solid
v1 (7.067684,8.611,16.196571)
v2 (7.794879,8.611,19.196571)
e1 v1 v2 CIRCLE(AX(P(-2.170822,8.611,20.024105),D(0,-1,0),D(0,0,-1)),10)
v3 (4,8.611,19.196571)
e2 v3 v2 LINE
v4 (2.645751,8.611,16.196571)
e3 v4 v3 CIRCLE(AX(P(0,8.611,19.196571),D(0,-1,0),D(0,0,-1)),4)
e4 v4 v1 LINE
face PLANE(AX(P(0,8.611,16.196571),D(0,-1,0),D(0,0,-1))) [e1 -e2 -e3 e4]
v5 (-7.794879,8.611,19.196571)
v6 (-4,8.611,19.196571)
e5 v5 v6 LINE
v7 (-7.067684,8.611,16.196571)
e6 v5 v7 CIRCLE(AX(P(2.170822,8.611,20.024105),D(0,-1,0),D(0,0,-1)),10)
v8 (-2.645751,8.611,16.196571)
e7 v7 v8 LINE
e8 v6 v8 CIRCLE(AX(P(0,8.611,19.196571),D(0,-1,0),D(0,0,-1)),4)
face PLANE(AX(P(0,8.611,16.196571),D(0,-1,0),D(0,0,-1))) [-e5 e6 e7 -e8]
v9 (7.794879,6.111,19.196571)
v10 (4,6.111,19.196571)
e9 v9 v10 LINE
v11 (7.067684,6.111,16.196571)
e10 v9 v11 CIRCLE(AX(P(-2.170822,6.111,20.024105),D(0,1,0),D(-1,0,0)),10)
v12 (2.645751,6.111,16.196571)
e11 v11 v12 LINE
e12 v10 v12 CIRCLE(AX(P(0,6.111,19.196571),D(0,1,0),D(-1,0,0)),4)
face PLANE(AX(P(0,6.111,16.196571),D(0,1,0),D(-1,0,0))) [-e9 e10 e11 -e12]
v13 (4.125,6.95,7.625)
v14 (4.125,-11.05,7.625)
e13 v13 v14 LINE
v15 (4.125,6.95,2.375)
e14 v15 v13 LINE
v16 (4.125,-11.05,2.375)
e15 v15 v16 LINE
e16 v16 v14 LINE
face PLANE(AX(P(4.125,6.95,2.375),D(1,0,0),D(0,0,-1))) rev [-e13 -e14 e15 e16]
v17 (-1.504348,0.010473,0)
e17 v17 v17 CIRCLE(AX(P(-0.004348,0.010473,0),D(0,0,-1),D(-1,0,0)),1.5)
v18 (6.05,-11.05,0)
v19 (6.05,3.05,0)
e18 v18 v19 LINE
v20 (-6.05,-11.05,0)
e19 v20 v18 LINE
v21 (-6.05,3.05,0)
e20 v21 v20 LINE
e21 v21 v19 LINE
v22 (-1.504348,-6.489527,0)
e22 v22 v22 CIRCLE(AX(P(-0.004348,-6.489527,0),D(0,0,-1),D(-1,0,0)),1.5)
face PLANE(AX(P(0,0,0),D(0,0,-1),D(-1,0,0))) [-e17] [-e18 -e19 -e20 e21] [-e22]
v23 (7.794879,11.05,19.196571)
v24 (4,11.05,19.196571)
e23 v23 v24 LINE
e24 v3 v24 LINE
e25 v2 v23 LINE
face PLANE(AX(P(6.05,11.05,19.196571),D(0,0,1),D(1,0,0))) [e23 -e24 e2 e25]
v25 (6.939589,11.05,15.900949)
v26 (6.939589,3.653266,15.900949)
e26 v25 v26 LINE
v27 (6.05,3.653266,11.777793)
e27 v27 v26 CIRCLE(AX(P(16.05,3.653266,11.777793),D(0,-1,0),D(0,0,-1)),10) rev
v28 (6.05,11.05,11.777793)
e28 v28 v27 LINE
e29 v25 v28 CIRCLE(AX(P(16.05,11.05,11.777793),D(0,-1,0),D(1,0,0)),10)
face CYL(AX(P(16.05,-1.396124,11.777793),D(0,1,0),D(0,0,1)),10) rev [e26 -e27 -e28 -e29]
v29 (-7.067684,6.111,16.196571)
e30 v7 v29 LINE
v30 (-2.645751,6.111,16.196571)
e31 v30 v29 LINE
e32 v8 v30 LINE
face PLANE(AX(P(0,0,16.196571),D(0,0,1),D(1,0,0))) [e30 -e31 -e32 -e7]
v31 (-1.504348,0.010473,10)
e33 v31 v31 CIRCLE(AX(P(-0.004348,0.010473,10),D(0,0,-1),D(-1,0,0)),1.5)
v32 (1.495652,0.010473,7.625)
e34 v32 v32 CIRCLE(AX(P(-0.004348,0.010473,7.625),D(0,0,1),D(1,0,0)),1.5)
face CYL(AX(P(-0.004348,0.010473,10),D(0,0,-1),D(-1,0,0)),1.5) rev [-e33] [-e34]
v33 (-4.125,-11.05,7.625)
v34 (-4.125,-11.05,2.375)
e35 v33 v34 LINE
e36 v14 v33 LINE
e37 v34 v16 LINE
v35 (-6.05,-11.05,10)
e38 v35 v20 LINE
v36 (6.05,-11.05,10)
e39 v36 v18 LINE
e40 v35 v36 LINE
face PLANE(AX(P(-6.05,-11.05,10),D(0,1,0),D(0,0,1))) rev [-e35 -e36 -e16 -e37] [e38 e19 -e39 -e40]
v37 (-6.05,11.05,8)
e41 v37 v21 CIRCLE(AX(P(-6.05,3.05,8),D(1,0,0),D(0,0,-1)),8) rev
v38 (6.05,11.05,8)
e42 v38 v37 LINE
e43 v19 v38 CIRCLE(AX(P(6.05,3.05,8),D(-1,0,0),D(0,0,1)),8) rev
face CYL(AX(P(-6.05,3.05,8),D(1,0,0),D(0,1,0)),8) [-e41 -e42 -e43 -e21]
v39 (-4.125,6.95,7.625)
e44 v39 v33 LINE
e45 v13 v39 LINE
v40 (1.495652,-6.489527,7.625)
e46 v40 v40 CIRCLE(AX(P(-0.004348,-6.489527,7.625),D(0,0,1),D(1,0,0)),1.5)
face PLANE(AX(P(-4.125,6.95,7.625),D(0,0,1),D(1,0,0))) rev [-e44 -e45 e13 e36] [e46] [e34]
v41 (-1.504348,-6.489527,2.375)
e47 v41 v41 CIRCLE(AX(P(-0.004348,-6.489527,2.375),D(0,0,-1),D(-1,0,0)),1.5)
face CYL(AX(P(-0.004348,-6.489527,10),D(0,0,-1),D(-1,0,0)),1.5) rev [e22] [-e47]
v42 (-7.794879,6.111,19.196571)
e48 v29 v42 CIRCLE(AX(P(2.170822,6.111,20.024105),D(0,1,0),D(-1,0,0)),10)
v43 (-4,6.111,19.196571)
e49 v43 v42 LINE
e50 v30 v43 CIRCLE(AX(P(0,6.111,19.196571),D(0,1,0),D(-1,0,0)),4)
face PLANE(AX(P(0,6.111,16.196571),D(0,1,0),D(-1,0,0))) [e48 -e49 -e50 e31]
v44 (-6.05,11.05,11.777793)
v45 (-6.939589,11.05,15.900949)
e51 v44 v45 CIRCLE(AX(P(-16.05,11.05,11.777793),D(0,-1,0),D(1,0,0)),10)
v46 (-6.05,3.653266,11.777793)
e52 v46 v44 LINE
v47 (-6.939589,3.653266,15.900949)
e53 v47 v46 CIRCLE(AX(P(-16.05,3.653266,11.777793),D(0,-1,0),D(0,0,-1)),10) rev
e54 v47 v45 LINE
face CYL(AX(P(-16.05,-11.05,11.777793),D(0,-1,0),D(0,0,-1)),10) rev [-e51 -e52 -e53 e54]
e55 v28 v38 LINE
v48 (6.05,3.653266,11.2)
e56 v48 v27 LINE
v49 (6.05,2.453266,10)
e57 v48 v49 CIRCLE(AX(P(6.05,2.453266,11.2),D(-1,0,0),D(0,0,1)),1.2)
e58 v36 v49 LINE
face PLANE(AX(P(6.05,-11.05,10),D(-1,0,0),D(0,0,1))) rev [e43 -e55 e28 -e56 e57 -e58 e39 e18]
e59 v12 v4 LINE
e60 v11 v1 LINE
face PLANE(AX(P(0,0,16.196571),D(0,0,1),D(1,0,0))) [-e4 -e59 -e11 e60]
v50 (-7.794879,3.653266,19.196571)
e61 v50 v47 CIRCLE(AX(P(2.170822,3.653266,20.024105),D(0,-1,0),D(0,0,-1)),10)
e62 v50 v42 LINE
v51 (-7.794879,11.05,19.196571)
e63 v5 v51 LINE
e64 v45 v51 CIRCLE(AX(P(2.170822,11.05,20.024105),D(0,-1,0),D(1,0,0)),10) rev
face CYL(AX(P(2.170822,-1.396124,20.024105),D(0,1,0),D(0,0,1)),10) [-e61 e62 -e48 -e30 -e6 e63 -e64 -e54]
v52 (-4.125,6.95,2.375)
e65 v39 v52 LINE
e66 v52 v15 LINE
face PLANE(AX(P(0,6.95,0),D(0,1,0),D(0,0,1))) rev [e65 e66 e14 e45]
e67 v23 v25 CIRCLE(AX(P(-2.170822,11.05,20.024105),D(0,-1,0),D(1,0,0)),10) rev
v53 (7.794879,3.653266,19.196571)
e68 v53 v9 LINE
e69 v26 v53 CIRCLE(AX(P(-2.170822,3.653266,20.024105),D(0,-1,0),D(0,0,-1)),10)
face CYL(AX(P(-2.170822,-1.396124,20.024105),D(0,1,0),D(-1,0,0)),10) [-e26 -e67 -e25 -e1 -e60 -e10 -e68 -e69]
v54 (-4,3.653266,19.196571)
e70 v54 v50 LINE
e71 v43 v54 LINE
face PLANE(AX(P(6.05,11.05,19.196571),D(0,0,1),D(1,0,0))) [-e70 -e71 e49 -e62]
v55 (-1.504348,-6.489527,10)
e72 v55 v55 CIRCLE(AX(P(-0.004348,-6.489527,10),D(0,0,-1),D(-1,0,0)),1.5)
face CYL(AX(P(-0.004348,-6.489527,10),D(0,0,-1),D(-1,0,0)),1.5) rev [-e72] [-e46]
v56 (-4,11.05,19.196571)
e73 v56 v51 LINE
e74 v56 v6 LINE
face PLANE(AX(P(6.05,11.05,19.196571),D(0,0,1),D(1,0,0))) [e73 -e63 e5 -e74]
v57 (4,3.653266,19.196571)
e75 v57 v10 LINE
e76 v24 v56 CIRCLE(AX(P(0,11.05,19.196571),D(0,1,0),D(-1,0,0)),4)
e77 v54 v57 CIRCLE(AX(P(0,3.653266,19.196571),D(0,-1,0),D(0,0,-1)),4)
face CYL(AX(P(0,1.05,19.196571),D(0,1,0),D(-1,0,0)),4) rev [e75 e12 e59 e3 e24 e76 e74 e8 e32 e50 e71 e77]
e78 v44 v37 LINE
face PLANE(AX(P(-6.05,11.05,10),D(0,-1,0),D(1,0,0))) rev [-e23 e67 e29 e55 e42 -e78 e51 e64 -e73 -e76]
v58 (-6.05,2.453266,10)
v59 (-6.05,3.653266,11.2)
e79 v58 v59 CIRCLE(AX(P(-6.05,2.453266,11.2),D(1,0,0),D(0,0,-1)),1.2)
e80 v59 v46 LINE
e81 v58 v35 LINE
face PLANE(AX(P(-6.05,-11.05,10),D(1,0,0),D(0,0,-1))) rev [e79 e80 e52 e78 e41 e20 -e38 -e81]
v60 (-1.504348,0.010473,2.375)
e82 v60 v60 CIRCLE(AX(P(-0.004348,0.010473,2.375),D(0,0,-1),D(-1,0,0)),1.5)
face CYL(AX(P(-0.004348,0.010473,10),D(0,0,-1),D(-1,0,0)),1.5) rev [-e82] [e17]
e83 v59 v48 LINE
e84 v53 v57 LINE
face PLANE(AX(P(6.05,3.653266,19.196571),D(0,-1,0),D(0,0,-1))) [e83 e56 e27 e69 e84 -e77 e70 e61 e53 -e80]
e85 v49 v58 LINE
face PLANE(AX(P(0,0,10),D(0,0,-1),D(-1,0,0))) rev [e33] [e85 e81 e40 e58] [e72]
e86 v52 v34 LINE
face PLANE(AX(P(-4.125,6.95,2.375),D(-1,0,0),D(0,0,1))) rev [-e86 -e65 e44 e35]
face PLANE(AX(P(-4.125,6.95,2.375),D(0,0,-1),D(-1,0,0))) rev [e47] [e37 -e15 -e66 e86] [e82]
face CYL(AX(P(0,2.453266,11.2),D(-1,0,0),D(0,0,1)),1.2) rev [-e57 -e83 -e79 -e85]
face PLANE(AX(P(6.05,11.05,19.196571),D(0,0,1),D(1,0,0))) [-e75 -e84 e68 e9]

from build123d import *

# Parameters (mm, degrees)
IZIM1_W                     = 12.1
IZIM1_H                     = 22.1
Y_KSEKLIK_EKSTR_ZYON1_DEPTH = 10
IZIM2_W                     = 8.25
IZIM2_H                     = 5.25
KES_EKSTR_ZYON1_DEPTH       = 18
IZIM3_R                     = 1.5
KES_EKSTR_ZYON2_DEPTH       = 17.084309124
IZIM4_W                     = 9.196571059
IZIM4_H                     = 7.396734232
Y_KSEKLIK_EKSTR_ZYON2_DEPTH = 12.1
IZIM6_W                     = 3.5
IZIM6_H                     = 2.438999841
IZIM6_H_2                   = 2.5
IZIM6_H_3                   = 2.457734391
IZIM6_W_2                   = 4.3
KES_EKSTR_ZYON3_DEPTH       = 3
RADYUS1_R                   = 1.2
RADYUS2_R                   = 8
IZIM7_R                     = 4
KES_EKSTR_ZYON4_DEPTH       = 10
IZIM8_W                     = 1.744878744
IZIM8_H                     = 1.717356621
Y_KSEKLIK_EKSTR_ZYON3_DEPTH = 7.396734232
KES_EKSTR_ZYON5_DEPTH       = 50
KES_EKSTR_ZYON5_DEPTH_BACK  = 50
IZIM9_W                     = 3
IZIM9_H                     = 2.5
RADYUS3_R                   = 10
RADYUS4_START               = 3
RADYUS4_DEPTH               = 9


with BuildPart() as part:
    # Çizim1 → Yükseklik-Ekstrüzyon1 (new body)
    with BuildSketch(Plane.XY):
        Rectangle(IZIM1_W, IZIM1_H)
    extrude(amount=Y_KSEKLIK_EKSTR_ZYON1_DEPTH)

    # Çizim2 → Kes-Ekstrüzyon1 (cut)
    with BuildSketch(Plane.XZ.offset(11.05)):
        with Locations((0, 5)):
            Rectangle(IZIM2_W, IZIM2_H)
    extrude(amount=-KES_EKSTR_ZYON1_DEPTH, mode=Mode.SUBTRACT)

    # Çizim3 → Kes-Ekstrüzyon2 (cut, through all)
    with BuildSketch(Plane(origin=(0, 0, 0), x_dir=(-1, 0, 0), z_dir=(0, 0, -1))):
        with Locations((0.004348468, -6.489526702)):
            Circle(IZIM3_R)
        with Locations((0.004348468, 0.010473298)):
            Circle(IZIM3_R)
    extrude(amount=-KES_EKSTR_ZYON2_DEPTH, mode=Mode.SUBTRACT)

    # Çizim4 → Yükseklik-Ekstrüzyon2 (add, through all)
    with BuildSketch(Plane.ZY.offset(6.05)):
        with Locations((14.59828553, 7.351632884)):
            Rectangle(IZIM4_W, IZIM4_H)
    extrude(amount=-Y_KSEKLIK_EKSTR_ZYON2_DEPTH)

    # Çizim6 → Kes-Ekstrüzyon3 (cut)
    with BuildSketch(Plane.XY.offset(19.196571059)):
        with Locations((0, 9.83050008)):
            Rectangle(IZIM6_W, IZIM6_H)
        with Locations((0, 7.361000159)):
            Rectangle(IZIM6_W, IZIM6_H_2)
        with Locations((0, 4.882132964)):
            Rectangle(IZIM6_W, IZIM6_H_3)
        with Locations((3.9, 7.361000159)):
            Rectangle(IZIM6_W_2, IZIM6_H_2)
        with Locations((-3.9, 7.361000159)):
            Rectangle(IZIM6_W_2, IZIM6_H_2)
    extrude(amount=-KES_EKSTR_ZYON3_DEPTH, mode=Mode.SUBTRACT)

    # Radyus1
    radyus1_edges = [part.edges().sort_by_distance(p)[0] for p in [
        (0, 3.653265768, 10),
    ]]
    fillet(radyus1_edges, radius=RADYUS1_R)

    # Radyus2
    radyus2_edges = [part.edges().sort_by_distance(p)[0] for p in [
        (0, 11.05, 0),
    ]]
    fillet(radyus2_edges, radius=RADYUS2_R)

    # Çizim7 → Kes-Ekstrüzyon4 (cut)
    with BuildSketch(Plane(origin=(0, 11.05, 0), x_dir=(1, 0, 0), z_dir=(0, 1, 0))):
        with Locations((0, -19.196571059)):
            Circle(IZIM7_R)
    extrude(amount=-KES_EKSTR_ZYON4_DEPTH, mode=Mode.SUBTRACT)

    # Çizim8 → Yükseklik-Ekstrüzyon3 (add)
    with BuildSketch(Plane(origin=(0, 11.05, 0), x_dir=(1, 0, 0), z_dir=(0, 1, 0))):
        with Locations((-6.922439372, -18.337892748)):
            Rectangle(IZIM8_W, IZIM8_H)
        Polygon((-6.05, -14.458244553), (-7.794878744, -17.479214438), (-6.05, -17.479214438), align=None)
        Polygon((6.05, -17.479214438), (7.794878744, -17.479214438), (6.05, -14.458244553), align=None)
        with Locations((6.922439372, -18.337892748)):
            Rectangle(IZIM8_W, IZIM8_H)
    extrude(amount=-Y_KSEKLIK_EKSTR_ZYON3_DEPTH)

    # Çizim9 → Kes-Ekstrüzyon5 (cut, two sides: drawn at the far end of the back side and taken through both)
    with BuildSketch(Plane.ZY.offset(-6.05).offset(-KES_EKSTR_ZYON5_DEPTH_BACK)):
        with Locations((17.696571059, 7.361000159)):
            Rectangle(IZIM9_W, IZIM9_H)
    extrude(amount=KES_EKSTR_ZYON5_DEPTH + KES_EKSTR_ZYON5_DEPTH_BACK, mode=Mode.SUBTRACT)

    # Radyus3
    # the kernel refuses this fillet: 10 mm, written as the material it adds along each edge
    with BuildSketch(Plane(origin=(6.05, 11.05, 14.458244553), x_dir=(0, 0, -1), z_dir=(0, -1, 0))) as radyus3_piece_1_section:
        with BuildLine():
            CenterArc((RADYUS3_R * 0.268045105611, RADYUS3_R), RADYUS3_R, 239.989745652, 30.010254348)
            Line((-RADYUS3_R * 0.232109880799, RADYUS3_R * 0.134064096154), (0, 0))
            Line((0, 0), (RADYUS3_R * 0.268045105611, 0))
        make_face()
    radyus3_piece_1 = extrude(amount=7.396734232, mode=Mode.PRIVATE)
    radyus3_piece_1 = split(radyus3_piece_1, bisect_by=Plane(origin=(6.05, 8.611000159, 14.458244553), z_dir=(0, 1, 0)), keep=Keep.TOP, mode=Mode.PRIVATE)
    radyus3_piece_1 = split(radyus3_piece_1, bisect_by=Plane(origin=(6.05, 11.05, 16.196571059), z_dir=(0, 0, -1)), keep=Keep.TOP, mode=Mode.PRIVATE)
    add(radyus3_piece_1)
    with BuildSketch(Plane(origin=(6.05, 11.05, 14.458244553), x_dir=(0, 0, -1), z_dir=(0, -1, 0))) as radyus3_piece_2_section:
        with BuildLine():
            CenterArc((RADYUS3_R * 0.268045105611, RADYUS3_R), RADYUS3_R, 239.989745652, 30.010254348)
            Line((-RADYUS3_R * 0.232109880799, RADYUS3_R * 0.134064096154), (0, 0))
            Line((0, 0), (RADYUS3_R * 0.268045105611, 0))
        make_face()
    radyus3_piece_2 = extrude(amount=7.396734232, mode=Mode.PRIVATE)
    radyus3_piece_2 = split(radyus3_piece_2, bisect_by=Plane(origin=(6.05, 8.611000159, 14.458244553), z_dir=(0, 1, 0)), keep=Keep.TOP, mode=Mode.PRIVATE)
    radyus3_piece_2 = split(radyus3_piece_2, bisect_by=Plane(origin=(6.05, 11.05, 16.196571059), z_dir=(0, 0, 1)), keep=Keep.TOP, mode=Mode.PRIVATE)
    add(radyus3_piece_2)
    with BuildSketch(Plane(origin=(6.05, 11.05, 14.458244553), x_dir=(0, 0, -1), z_dir=(0, -1, 0))) as radyus3_piece_3_section:
        with BuildLine():
            CenterArc((RADYUS3_R * 0.268045105611, RADYUS3_R), RADYUS3_R, 239.989745652, 30.010254348)
            Line((-RADYUS3_R * 0.232109880799, RADYUS3_R * 0.134064096154), (0, 0))
            Line((0, 0), (RADYUS3_R * 0.268045105611, 0))
        make_face()
    radyus3_piece_3 = extrude(amount=7.396734232, mode=Mode.PRIVATE)
    radyus3_piece_3 = split(radyus3_piece_3, bisect_by=Plane(origin=(6.05, 8.611000159, 14.458244553), z_dir=(0, -1, 0)), keep=Keep.TOP, mode=Mode.PRIVATE)
    radyus3_piece_3 = split(radyus3_piece_3, bisect_by=Plane(origin=(6.05, 11.05, 16.196571059), z_dir=(0, 0, -1)), keep=Keep.TOP, mode=Mode.PRIVATE)
    radyus3_piece_3 = split(radyus3_piece_3, bisect_by=Plane(origin=(6.05, 6.111000159, 14.458244553), z_dir=(0, 1, 0)), keep=Keep.TOP, mode=Mode.PRIVATE)
    add(radyus3_piece_3)
    with BuildSketch(Plane(origin=(6.05, 11.05, 14.458244553), x_dir=(0, 0, -1), z_dir=(0, -1, 0))) as radyus3_piece_4_section:
        with BuildLine():
            CenterArc((RADYUS3_R * 0.268045105611, RADYUS3_R), RADYUS3_R, 239.989745652, 30.010254348)
            Line((-RADYUS3_R * 0.232109880799, RADYUS3_R * 0.134064096154), (0, 0))
            Line((0, 0), (RADYUS3_R * 0.268045105611, 0))
        make_face()
    radyus3_piece_4 = extrude(amount=7.396734232, mode=Mode.PRIVATE)
    radyus3_piece_4 = split(radyus3_piece_4, bisect_by=Plane(origin=(6.05, 11.05, 16.196571059), z_dir=(0, 0, -1)), keep=Keep.TOP, mode=Mode.PRIVATE)
    radyus3_piece_4 = split(radyus3_piece_4, bisect_by=Plane(origin=(6.05, 6.111000159, 14.458244553), z_dir=(0, -1, 0)), keep=Keep.TOP, mode=Mode.PRIVATE)
    add(radyus3_piece_4)
    with BuildSketch(Plane(origin=(6.05, 11.05, 14.458244553), x_dir=(0, 0, -1), z_dir=(0, -1, 0))) as radyus3_piece_5_section:
        with BuildLine():
            CenterArc((RADYUS3_R * 0.268045105611, RADYUS3_R), RADYUS3_R, 239.989745652, 30.010254348)
            Line((-RADYUS3_R * 0.232109880799, RADYUS3_R * 0.134064096154), (0, 0))
            Line((0, 0), (RADYUS3_R * 0.268045105611, 0))
        make_face()
    radyus3_piece_5 = extrude(amount=7.396734232, mode=Mode.PRIVATE)
    radyus3_piece_5 = split(radyus3_piece_5, bisect_by=Plane(origin=(6.05, 11.05, 16.196571059), z_dir=(0, 0, 1)), keep=Keep.TOP, mode=Mode.PRIVATE)
    radyus3_piece_5 = split(radyus3_piece_5, bisect_by=Plane(origin=(6.05, 6.111000159, 14.458244553), z_dir=(0, -1, 0)), keep=Keep.TOP, mode=Mode.PRIVATE)
    add(radyus3_piece_5)
    with BuildSketch(Plane(origin=(-6.05, 11.05, 14.458244553), x_dir=(0, 0, -1), z_dir=(0, -1, 0))) as radyus3_piece_6_section:
        with BuildLine():
            CenterArc((RADYUS3_R * 0.268045105611, -RADYUS3_R), RADYUS3_R, 90, 30.010254348)
            Line((-RADYUS3_R * 0.232109880799, -RADYUS3_R * 0.134064096154), (0, 0))
            Line((0, 0), (RADYUS3_R * 0.268045105611, 0))
        make_face()
    radyus3_piece_6 = extrude(amount=7.396734232, mode=Mode.PRIVATE)
    radyus3_piece_6 = split(radyus3_piece_6, bisect_by=Plane(origin=(-6.05, 8.611000159, 14.458244553), z_dir=(0, 1, 0)), keep=Keep.TOP, mode=Mode.PRIVATE)
    radyus3_piece_6 = split(radyus3_piece_6, bisect_by=Plane(origin=(-6.05, 11.05, 16.196571059), z_dir=(0, 0, -1)), keep=Keep.TOP, mode=Mode.PRIVATE)
    add(radyus3_piece_6)
    with BuildSketch(Plane(origin=(-6.05, 11.05, 14.458244553), x_dir=(0, 0, -1), z_dir=(0, -1, 0))) as radyus3_piece_7_section:
        with BuildLine():
            CenterArc((RADYUS3_R * 0.268045105611, -RADYUS3_R), RADYUS3_R, 90, 30.010254348)
            Line((-RADYUS3_R * 0.232109880799, -RADYUS3_R * 0.134064096154), (0, 0))
            Line((0, 0), (RADYUS3_R * 0.268045105611, 0))
        make_face()
    radyus3_piece_7 = extrude(amount=7.396734232, mode=Mode.PRIVATE)
    radyus3_piece_7 = split(radyus3_piece_7, bisect_by=Plane(origin=(-6.05, 8.611000159, 14.458244553), z_dir=(0, 1, 0)), keep=Keep.TOP, mode=Mode.PRIVATE)
    radyus3_piece_7 = split(radyus3_piece_7, bisect_by=Plane(origin=(-6.05, 11.05, 16.196571059), z_dir=(0, 0, 1)), keep=Keep.TOP, mode=Mode.PRIVATE)
    add(radyus3_piece_7)
    with BuildSketch(Plane(origin=(-6.05, 11.05, 14.458244553), x_dir=(0, 0, -1), z_dir=(0, -1, 0))) as radyus3_piece_8_section:
        with BuildLine():
            CenterArc((RADYUS3_R * 0.268045105611, -RADYUS3_R), RADYUS3_R, 90, 30.010254348)
            Line((-RADYUS3_R * 0.232109880799, -RADYUS3_R * 0.134064096154), (0, 0))
            Line((0, 0), (RADYUS3_R * 0.268045105611, 0))
        make_face()
    radyus3_piece_8 = extrude(amount=7.396734232, mode=Mode.PRIVATE)
    radyus3_piece_8 = split(radyus3_piece_8, bisect_by=Plane(origin=(-6.05, 8.611000159, 14.458244553), z_dir=(0, -1, 0)), keep=Keep.TOP, mode=Mode.PRIVATE)
    radyus3_piece_8 = split(radyus3_piece_8, bisect_by=Plane(origin=(-6.05, 11.05, 16.196571059), z_dir=(0, 0, -1)), keep=Keep.TOP, mode=Mode.PRIVATE)
    radyus3_piece_8 = split(radyus3_piece_8, bisect_by=Plane(origin=(-6.05, 6.111000159, 14.458244553), z_dir=(0, 1, 0)), keep=Keep.TOP, mode=Mode.PRIVATE)
    add(radyus3_piece_8)
    with BuildSketch(Plane(origin=(-6.05, 11.05, 14.458244553), x_dir=(0, 0, -1), z_dir=(0, -1, 0))) as radyus3_piece_9_section:
        with BuildLine():
            CenterArc((RADYUS3_R * 0.268045105611, -RADYUS3_R), RADYUS3_R, 90, 30.010254348)
            Line((-RADYUS3_R * 0.232109880799, -RADYUS3_R * 0.134064096154), (0, 0))
            Line((0, 0), (RADYUS3_R * 0.268045105611, 0))
        make_face()
    radyus3_piece_9 = extrude(amount=7.396734232, mode=Mode.PRIVATE)
    radyus3_piece_9 = split(radyus3_piece_9, bisect_by=Plane(origin=(-6.05, 11.05, 16.196571059), z_dir=(0, 0, -1)), keep=Keep.TOP, mode=Mode.PRIVATE)
    radyus3_piece_9 = split(radyus3_piece_9, bisect_by=Plane(origin=(-6.05, 6.111000159, 14.458244553), z_dir=(0, -1, 0)), keep=Keep.TOP, mode=Mode.PRIVATE)
    add(radyus3_piece_9)
    with BuildSketch(Plane(origin=(-6.05, 11.05, 14.458244553), x_dir=(0, 0, -1), z_dir=(0, -1, 0))) as radyus3_piece_10_section:
        with BuildLine():
            CenterArc((RADYUS3_R * 0.268045105611, -RADYUS3_R), RADYUS3_R, 90, 30.010254348)
            Line((-RADYUS3_R * 0.232109880799, -RADYUS3_R * 0.134064096154), (0, 0))
            Line((0, 0), (RADYUS3_R * 0.268045105611, 0))
        make_face()
    radyus3_piece_10 = extrude(amount=7.396734232, mode=Mode.PRIVATE)
    radyus3_piece_10 = split(radyus3_piece_10, bisect_by=Plane(origin=(-6.05, 11.05, 16.196571059), z_dir=(0, 0, 1)), keep=Keep.TOP, mode=Mode.PRIVATE)
    radyus3_piece_10 = split(radyus3_piece_10, bisect_by=Plane(origin=(-6.05, 6.111000159, 14.458244553), z_dir=(0, -1, 0)), keep=Keep.TOP, mode=Mode.PRIVATE)
    add(radyus3_piece_10)

    # Radyus4: read off the stored shape, not the designer's step
    # Radyus4 outline → Radyus4 (cut)
    with BuildSketch(Plane(origin=(0, 0, 0), x_dir=(1, 0, 0), z_dir=(0, 1, 0)).offset(RADYUS4_START)):
        with BuildLine():
            ThreePointArc((-7.794878744, -19.196571059), (-7.508526716, -17.512091406), (-6.939589091, -15.900949214))
            ThreePointArc((-6.939589091, -15.900949214), (-7.154266469, -16.345716978), (-7.390640962, -16.779343361))
            Line((-7.390640962, -16.779343361), (-7.794878744, -17.479214438))
            Line((-7.794878744, -17.479214438), (-7.794878744, -19.196571059))
        make_face()
        with BuildLine():
            ThreePointArc((6.939589091, -15.900949214), (7.508526716, -17.512091406), (7.794878744, -19.196571059))
            Line((7.794878744, -19.196571059), (7.794878744, -17.479214438))
            Line((7.794878744, -17.479214438), (7.390640962, -16.779343361))
            ThreePointArc((7.390640962, -16.779343361), (7.154266469, -16.345716978), (6.939589091, -15.900949214))
        make_face()
    extrude(amount=RADYUS4_DEPTH, mode=Mode.SUBTRACT)


solid = part.part
